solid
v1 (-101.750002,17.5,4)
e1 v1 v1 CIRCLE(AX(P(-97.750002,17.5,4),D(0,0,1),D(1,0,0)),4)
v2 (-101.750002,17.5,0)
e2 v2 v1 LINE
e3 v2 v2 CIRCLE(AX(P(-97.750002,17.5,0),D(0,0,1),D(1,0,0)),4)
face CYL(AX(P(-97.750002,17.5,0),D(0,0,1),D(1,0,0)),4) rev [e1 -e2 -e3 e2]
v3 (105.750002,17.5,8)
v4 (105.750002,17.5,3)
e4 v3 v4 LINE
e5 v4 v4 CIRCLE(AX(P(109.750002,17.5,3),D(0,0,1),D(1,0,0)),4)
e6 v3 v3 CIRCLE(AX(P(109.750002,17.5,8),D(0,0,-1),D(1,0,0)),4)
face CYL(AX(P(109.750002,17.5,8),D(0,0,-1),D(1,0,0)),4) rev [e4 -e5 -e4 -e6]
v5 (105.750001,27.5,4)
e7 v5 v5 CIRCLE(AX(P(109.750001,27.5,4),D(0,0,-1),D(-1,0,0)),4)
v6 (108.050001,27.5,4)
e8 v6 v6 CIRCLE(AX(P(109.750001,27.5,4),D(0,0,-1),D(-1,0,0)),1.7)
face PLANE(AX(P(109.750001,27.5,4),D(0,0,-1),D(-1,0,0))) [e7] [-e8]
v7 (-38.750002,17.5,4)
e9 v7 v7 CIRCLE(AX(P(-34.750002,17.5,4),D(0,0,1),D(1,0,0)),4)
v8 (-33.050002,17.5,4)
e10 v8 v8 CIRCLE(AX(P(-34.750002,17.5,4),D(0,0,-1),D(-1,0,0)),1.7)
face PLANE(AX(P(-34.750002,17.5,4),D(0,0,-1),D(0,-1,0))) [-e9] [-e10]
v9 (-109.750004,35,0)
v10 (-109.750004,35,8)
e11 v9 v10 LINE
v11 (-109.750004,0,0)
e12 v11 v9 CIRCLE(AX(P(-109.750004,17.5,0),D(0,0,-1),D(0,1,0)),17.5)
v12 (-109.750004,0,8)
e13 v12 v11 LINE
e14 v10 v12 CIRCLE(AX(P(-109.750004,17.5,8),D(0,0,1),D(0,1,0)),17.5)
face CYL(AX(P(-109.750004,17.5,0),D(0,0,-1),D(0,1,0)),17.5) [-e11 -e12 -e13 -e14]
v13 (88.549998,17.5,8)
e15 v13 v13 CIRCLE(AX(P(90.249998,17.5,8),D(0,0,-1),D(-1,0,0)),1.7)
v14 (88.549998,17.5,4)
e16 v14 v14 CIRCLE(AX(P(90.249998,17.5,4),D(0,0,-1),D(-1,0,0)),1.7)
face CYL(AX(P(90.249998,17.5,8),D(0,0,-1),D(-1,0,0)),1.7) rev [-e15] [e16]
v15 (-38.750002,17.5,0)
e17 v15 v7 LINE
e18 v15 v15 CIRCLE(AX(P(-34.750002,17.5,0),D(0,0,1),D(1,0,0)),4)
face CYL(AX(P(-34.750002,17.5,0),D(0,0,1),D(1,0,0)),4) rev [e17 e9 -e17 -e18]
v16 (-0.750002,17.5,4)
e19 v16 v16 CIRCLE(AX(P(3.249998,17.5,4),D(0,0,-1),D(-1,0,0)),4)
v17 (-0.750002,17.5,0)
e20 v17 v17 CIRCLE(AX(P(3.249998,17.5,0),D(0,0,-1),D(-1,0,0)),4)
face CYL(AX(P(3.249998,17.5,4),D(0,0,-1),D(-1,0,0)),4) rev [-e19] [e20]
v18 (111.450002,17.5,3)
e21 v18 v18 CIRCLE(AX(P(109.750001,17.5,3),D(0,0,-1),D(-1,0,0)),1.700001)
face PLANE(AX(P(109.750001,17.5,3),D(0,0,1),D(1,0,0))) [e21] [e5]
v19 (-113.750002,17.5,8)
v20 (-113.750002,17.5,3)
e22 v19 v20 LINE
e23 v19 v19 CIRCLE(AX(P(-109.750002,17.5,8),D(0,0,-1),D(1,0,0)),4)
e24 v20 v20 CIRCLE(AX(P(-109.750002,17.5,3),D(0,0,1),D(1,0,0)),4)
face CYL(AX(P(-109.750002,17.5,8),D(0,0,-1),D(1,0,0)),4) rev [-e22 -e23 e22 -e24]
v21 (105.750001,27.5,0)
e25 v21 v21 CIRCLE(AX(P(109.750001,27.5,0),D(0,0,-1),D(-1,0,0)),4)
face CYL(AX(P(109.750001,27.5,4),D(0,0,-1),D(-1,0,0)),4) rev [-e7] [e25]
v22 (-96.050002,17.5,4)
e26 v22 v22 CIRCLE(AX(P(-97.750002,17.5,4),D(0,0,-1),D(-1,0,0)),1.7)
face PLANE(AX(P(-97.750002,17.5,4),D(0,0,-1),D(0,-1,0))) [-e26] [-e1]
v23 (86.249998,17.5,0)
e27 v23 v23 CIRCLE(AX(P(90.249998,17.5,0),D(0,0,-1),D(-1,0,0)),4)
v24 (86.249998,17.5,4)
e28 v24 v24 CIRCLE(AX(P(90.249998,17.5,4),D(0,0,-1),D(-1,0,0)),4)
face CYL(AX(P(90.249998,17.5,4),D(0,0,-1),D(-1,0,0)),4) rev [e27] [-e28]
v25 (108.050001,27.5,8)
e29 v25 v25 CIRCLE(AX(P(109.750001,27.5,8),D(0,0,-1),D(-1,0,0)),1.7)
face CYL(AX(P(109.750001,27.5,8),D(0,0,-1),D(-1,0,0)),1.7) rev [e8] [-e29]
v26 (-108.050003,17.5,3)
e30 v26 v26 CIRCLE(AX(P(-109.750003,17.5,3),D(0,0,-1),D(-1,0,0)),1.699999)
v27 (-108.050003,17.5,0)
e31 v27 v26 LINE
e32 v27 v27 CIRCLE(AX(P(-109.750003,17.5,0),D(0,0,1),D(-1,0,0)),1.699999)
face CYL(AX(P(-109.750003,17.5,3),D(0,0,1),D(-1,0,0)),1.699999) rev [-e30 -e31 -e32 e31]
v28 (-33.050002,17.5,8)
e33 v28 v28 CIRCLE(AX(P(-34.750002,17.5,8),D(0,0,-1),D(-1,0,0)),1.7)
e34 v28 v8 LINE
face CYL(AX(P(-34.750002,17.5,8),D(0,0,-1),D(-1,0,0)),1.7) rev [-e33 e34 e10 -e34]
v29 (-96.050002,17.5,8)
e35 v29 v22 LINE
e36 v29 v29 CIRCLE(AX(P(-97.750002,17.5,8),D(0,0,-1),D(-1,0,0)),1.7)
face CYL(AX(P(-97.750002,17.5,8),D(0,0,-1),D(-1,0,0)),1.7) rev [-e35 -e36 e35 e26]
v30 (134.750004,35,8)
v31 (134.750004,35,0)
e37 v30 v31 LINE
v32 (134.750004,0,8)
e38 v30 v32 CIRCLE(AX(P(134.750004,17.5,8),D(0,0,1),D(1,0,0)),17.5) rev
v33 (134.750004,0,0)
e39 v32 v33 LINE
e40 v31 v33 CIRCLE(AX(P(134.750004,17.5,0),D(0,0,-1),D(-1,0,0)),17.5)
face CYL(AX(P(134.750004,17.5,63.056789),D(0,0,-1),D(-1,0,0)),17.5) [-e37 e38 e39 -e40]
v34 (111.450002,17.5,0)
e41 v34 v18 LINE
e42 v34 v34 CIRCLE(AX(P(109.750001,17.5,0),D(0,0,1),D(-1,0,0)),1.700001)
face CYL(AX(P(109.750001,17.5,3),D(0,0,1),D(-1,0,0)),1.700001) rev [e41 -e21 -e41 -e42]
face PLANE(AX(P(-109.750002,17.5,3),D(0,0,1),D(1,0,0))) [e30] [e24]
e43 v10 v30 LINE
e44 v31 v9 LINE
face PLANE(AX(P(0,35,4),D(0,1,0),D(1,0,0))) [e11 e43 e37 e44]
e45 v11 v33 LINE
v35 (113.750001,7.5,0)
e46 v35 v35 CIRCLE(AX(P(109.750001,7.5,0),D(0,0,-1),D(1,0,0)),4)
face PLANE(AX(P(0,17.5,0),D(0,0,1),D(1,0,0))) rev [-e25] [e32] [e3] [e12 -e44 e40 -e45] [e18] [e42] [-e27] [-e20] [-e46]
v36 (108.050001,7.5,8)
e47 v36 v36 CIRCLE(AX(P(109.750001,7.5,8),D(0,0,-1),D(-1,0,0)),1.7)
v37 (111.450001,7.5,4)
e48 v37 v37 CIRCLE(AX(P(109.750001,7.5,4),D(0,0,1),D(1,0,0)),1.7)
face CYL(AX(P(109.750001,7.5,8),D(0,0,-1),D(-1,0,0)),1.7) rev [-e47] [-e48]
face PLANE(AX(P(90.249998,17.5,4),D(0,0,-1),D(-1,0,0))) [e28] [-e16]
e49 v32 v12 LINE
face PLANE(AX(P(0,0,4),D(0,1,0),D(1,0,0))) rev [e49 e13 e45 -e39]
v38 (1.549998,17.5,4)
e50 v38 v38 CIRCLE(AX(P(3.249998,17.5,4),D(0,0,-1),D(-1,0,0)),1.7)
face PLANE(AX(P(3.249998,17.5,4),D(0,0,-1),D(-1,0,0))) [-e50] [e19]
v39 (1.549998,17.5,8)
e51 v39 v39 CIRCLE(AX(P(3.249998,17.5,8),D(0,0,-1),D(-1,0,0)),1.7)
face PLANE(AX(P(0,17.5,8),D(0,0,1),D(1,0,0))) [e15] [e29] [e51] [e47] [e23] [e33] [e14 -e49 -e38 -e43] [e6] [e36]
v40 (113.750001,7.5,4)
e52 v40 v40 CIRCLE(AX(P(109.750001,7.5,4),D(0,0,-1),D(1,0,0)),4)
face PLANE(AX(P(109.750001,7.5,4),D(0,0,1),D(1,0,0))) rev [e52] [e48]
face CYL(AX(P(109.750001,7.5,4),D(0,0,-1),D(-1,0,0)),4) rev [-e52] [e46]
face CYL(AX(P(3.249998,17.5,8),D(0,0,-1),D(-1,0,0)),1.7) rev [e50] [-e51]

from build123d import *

# Parameters (mm, degrees)
CUT_EXTRUDE1_START         = -8.000000119
CUT_EXTRUDE1_OUTLINE_R     = 3.999999708
CUT_EXTRUDE1_OUTLINE_R_2   = 4
CUT_EXTRUDE1_OUTLINE_R_3   = 4.000000498
CUT_EXTRUDE1_OUTLINE_R_4   = 1.7
CUT_EXTRUDE1_DEPTH         = 8.000000119
CUT_EXTRUDE1_2_OUTLINE_R   = 4
CUT_EXTRUDE1_2_OUTLINE_R_2 = 1.7
CUT_EXTRUDE1_2_DEPTH       = 4.000000119
CUT_EXTRUDE1_START_2       = -3.000000119
CUT_EXTRUDE1_3_OUTLINE_R   = 4.000000498
CUT_EXTRUDE1_3_OUTLINE_R_2 = 1.699999454
CUT_EXTRUDE1_3_OUTLINE_R_3 = 3.999999708
CUT_EXTRUDE1_3_OUTLINE_R_4 = 1.700000883
CUT_EXTRUDE1_3_DEPTH       = 3.000000119
SKETCH2_R                  = 1.7
CUT_EXTRUDE2_DEPTH         = 133.217863668
BOSS_EXTRUDE1_START        = -8.000000119
BOSS_EXTRUDE1_DEPTH        = 8.000000119
SKETCH4_R                  = 4
SKETCH4_R_2                = 1.7
CUT_EXTRUDE3_DEPTH         = 4
SKETCH5_R                  = 1.7
CUT_EXTRUDE4_DEPTH         = 157.425904707


with BuildPart() as part:
    # Cut-Extrude1: read off the stored shape, not the designer's step
    # Cut-Extrude1 outline → Cut-Extrude1 (new body)
    # profile 1 of 3: a face of its own
    with BuildSketch(Plane(origin=(0, 0, 0), x_dir=(-1, 0, 0), z_dir=(0, 0, -1)).offset(CUT_EXTRUDE1_START)):
        with BuildLine():
            ThreePointArc((109.750003815, 0), (127.250003815, 17.5), (109.750003815, 35))
            Line((109.750003815, 35), (-109.750003815, 35))
            ThreePointArc((-109.750003815, 35), (-127.250003815, 17.5), (-109.750003815, 0))
            Line((-109.750003815, 0), (109.750003815, 0))
        make_face()
        with Locations((-109.750001685, 17.500000345)):
            Circle(CUT_EXTRUDE1_OUTLINE_R, mode=Mode.SUBTRACT)
        with Locations((-90.249998482, 17.5)):
            Circle(CUT_EXTRUDE1_OUTLINE_R_2, mode=Mode.SUBTRACT)
        with Locations((-3.249998482, 17.5)):
            Circle(CUT_EXTRUDE1_OUTLINE_R_2, mode=Mode.SUBTRACT)
        with Locations((34.750001518, 17.5)):
            Circle(CUT_EXTRUDE1_OUTLINE_R_2, mode=Mode.SUBTRACT)
        with Locations((97.750001518, 17.5)):
            Circle(CUT_EXTRUDE1_OUTLINE_R_2, mode=Mode.SUBTRACT)
        with Locations((109.750001518, 17.500000345)):
            Circle(CUT_EXTRUDE1_OUTLINE_R_3, mode=Mode.SUBTRACT)
    # profile 2 of 3: a face of its own
    with BuildSketch(Plane(origin=(0, 0, 0), x_dir=(-1, 0, 0), z_dir=(0, 0, -1)).offset(CUT_EXTRUDE1_START)):
        with Locations((-3.249998482, 17.5)):
            Circle(CUT_EXTRUDE1_OUTLINE_R_4)
    # profile 3 of 3: a face of its own
    with BuildSketch(Plane(origin=(0, 0, 0), x_dir=(-1, 0, 0), z_dir=(0, 0, -1)).offset(CUT_EXTRUDE1_START)):
        with Locations((-90.249998482, 17.5)):
            Circle(CUT_EXTRUDE1_OUTLINE_R_4)
    extrude(amount=CUT_EXTRUDE1_DEPTH)

    # Cut-Extrude1 2 outline → Cut-Extrude1 2 (add)
    # profile 1 of 4: a face of its own
    with BuildSketch(Plane(origin=(0, 0, 0), x_dir=(-1, 0, 0), z_dir=(0, 0, -1)).offset(CUT_EXTRUDE1_START)):
        with Locations((34.750001518, 17.5)):
            Circle(CUT_EXTRUDE1_2_OUTLINE_R)
        with Locations((34.750001518, 17.5)):
            Circle(CUT_EXTRUDE1_2_OUTLINE_R_2, mode=Mode.SUBTRACT)
    # profile 2 of 4: a face of its own
    with BuildSketch(Plane(origin=(0, 0, 0), x_dir=(-1, 0, 0), z_dir=(0, 0, -1)).offset(CUT_EXTRUDE1_START)):
        with Locations((97.750001518, 17.5)):
            Circle(CUT_EXTRUDE1_2_OUTLINE_R)
        with Locations((97.750001518, 17.5)):
            Circle(CUT_EXTRUDE1_2_OUTLINE_R_2, mode=Mode.SUBTRACT)
    # profile 3 of 4: a face of its own
    with BuildSketch(Plane(origin=(0, 0, 0), x_dir=(-1, 0, 0), z_dir=(0, 0, -1)).offset(CUT_EXTRUDE1_START)):
        with Locations((-3.249998482, 17.5)):
            Circle(CUT_EXTRUDE1_2_OUTLINE_R)
        with Locations((-3.249998482, 17.5)):
            Circle(CUT_EXTRUDE1_2_OUTLINE_R_2, mode=Mode.SUBTRACT)
    # profile 4 of 4: a face of its own
    with BuildSketch(Plane(origin=(0, 0, 0), x_dir=(-1, 0, 0), z_dir=(0, 0, -1)).offset(CUT_EXTRUDE1_START)):
        with Locations((-90.249998482, 17.5)):
            Circle(CUT_EXTRUDE1_2_OUTLINE_R)
        with Locations((-90.249998482, 17.5)):
            Circle(CUT_EXTRUDE1_2_OUTLINE_R_2, mode=Mode.SUBTRACT)
    extrude(amount=CUT_EXTRUDE1_2_DEPTH)

    # Cut-Extrude1 3 outline → Cut-Extrude1 3 (add)
    # profile 1 of 2: a face of its own
    with BuildSketch(Plane(origin=(0, 0, 0), x_dir=(-1, 0, 0), z_dir=(0, 0, -1)).offset(CUT_EXTRUDE1_START_2)):
        with Locations((109.750001518, 17.500000345)):
            Circle(CUT_EXTRUDE1_3_OUTLINE_R)
        with Locations((109.750002847, 17.500000345)):
            Circle(CUT_EXTRUDE1_3_OUTLINE_R_2, mode=Mode.SUBTRACT)
    # profile 2 of 2: a face of its own
    with BuildSketch(Plane(origin=(0, 0, 0), x_dir=(-1, 0, 0), z_dir=(0, 0, -1)).offset(CUT_EXTRUDE1_START_2)):
        with Locations((-109.750001685, 17.500000345)):
            Circle(CUT_EXTRUDE1_3_OUTLINE_R_3)
        with Locations((-109.750001213, 17.500000345)):
            Circle(CUT_EXTRUDE1_3_OUTLINE_R_4, mode=Mode.SUBTRACT)
    extrude(amount=CUT_EXTRUDE1_3_DEPTH)

    # Sketch2 → Cut-Extrude2 (cut, through all)
    with BuildSketch(Plane(origin=(0, 0, 0), x_dir=(-1, 0, 0), z_dir=(0, 0, -1))):
        with Locations((-90.249998482, 17.5)):
            Circle(SKETCH2_R)
        with Locations((-3.249998482, 17.5)):
            Circle(SKETCH2_R)
    extrude(amount=-CUT_EXTRUDE2_DEPTH, mode=Mode.SUBTRACT)

    # Sketch3 → Boss-Extrude1 (add)
    with BuildSketch(Plane(origin=(0, 0, 0), x_dir=(-1, 0, 0), z_dir=(0, 0, -1)).offset(BOSS_EXTRUDE1_START)):
        with BuildLine():
            Line((-109.750003815, 35), (-134.750003815, 35))
            ThreePointArc((-134.750003815, 35), (-152.250003815, 17.5), (-134.750003815, 0))
            Line((-134.750003815, 0), (-109.750003815, 0))
            ThreePointArc((-109.750003815, 0), (-127.250003815, 17.5), (-109.750003815, 35))
        make_face()
    extrude(amount=BOSS_EXTRUDE1_DEPTH)

    # Sketch4 → Cut-Extrude3 (cut)
    # profile 1 of 2: a face of its own
    with BuildSketch(Plane(origin=(0, 0, 0), x_dir=(-1, 0, 0), z_dir=(0, 0, -1))):
        with Locations((-109.750001213, 27.500000345)):
            Circle(SKETCH4_R)
        with Locations((-109.750001213, 27.500000345)):
            Circle(SKETCH4_R_2, mode=Mode.SUBTRACT)
    # profile 2 of 2: a face of its own
    with BuildSketch(Plane(origin=(0, 0, 0), x_dir=(-1, 0, 0), z_dir=(0, 0, -1))):
        with Locations(Location((-109.750001213, 7.500000345, 0), (0, 0, 180))):
            Circle(SKETCH4_R)
        with Locations(Location((-109.750001213, 7.500000345, 0), (0, 0, 180))):
            Circle(SKETCH4_R_2, mode=Mode.SUBTRACT)
    extrude(amount=-CUT_EXTRUDE3_DEPTH, mode=Mode.SUBTRACT)

    # Sketch5 → Cut-Extrude4 (cut, through all)
    with BuildSketch(Plane(origin=(0, 0, 0), x_dir=(-1, 0, 0), z_dir=(0, 0, -1))):
        with Locations((-109.750001213, 27.500000345)):
            Circle(SKETCH5_R)
        with Locations((-109.750001213, 7.500000345)):
            Circle(SKETCH5_R)
    extrude(amount=-CUT_EXTRUDE4_DEPTH, mode=Mode.SUBTRACT)


solid = part.part
